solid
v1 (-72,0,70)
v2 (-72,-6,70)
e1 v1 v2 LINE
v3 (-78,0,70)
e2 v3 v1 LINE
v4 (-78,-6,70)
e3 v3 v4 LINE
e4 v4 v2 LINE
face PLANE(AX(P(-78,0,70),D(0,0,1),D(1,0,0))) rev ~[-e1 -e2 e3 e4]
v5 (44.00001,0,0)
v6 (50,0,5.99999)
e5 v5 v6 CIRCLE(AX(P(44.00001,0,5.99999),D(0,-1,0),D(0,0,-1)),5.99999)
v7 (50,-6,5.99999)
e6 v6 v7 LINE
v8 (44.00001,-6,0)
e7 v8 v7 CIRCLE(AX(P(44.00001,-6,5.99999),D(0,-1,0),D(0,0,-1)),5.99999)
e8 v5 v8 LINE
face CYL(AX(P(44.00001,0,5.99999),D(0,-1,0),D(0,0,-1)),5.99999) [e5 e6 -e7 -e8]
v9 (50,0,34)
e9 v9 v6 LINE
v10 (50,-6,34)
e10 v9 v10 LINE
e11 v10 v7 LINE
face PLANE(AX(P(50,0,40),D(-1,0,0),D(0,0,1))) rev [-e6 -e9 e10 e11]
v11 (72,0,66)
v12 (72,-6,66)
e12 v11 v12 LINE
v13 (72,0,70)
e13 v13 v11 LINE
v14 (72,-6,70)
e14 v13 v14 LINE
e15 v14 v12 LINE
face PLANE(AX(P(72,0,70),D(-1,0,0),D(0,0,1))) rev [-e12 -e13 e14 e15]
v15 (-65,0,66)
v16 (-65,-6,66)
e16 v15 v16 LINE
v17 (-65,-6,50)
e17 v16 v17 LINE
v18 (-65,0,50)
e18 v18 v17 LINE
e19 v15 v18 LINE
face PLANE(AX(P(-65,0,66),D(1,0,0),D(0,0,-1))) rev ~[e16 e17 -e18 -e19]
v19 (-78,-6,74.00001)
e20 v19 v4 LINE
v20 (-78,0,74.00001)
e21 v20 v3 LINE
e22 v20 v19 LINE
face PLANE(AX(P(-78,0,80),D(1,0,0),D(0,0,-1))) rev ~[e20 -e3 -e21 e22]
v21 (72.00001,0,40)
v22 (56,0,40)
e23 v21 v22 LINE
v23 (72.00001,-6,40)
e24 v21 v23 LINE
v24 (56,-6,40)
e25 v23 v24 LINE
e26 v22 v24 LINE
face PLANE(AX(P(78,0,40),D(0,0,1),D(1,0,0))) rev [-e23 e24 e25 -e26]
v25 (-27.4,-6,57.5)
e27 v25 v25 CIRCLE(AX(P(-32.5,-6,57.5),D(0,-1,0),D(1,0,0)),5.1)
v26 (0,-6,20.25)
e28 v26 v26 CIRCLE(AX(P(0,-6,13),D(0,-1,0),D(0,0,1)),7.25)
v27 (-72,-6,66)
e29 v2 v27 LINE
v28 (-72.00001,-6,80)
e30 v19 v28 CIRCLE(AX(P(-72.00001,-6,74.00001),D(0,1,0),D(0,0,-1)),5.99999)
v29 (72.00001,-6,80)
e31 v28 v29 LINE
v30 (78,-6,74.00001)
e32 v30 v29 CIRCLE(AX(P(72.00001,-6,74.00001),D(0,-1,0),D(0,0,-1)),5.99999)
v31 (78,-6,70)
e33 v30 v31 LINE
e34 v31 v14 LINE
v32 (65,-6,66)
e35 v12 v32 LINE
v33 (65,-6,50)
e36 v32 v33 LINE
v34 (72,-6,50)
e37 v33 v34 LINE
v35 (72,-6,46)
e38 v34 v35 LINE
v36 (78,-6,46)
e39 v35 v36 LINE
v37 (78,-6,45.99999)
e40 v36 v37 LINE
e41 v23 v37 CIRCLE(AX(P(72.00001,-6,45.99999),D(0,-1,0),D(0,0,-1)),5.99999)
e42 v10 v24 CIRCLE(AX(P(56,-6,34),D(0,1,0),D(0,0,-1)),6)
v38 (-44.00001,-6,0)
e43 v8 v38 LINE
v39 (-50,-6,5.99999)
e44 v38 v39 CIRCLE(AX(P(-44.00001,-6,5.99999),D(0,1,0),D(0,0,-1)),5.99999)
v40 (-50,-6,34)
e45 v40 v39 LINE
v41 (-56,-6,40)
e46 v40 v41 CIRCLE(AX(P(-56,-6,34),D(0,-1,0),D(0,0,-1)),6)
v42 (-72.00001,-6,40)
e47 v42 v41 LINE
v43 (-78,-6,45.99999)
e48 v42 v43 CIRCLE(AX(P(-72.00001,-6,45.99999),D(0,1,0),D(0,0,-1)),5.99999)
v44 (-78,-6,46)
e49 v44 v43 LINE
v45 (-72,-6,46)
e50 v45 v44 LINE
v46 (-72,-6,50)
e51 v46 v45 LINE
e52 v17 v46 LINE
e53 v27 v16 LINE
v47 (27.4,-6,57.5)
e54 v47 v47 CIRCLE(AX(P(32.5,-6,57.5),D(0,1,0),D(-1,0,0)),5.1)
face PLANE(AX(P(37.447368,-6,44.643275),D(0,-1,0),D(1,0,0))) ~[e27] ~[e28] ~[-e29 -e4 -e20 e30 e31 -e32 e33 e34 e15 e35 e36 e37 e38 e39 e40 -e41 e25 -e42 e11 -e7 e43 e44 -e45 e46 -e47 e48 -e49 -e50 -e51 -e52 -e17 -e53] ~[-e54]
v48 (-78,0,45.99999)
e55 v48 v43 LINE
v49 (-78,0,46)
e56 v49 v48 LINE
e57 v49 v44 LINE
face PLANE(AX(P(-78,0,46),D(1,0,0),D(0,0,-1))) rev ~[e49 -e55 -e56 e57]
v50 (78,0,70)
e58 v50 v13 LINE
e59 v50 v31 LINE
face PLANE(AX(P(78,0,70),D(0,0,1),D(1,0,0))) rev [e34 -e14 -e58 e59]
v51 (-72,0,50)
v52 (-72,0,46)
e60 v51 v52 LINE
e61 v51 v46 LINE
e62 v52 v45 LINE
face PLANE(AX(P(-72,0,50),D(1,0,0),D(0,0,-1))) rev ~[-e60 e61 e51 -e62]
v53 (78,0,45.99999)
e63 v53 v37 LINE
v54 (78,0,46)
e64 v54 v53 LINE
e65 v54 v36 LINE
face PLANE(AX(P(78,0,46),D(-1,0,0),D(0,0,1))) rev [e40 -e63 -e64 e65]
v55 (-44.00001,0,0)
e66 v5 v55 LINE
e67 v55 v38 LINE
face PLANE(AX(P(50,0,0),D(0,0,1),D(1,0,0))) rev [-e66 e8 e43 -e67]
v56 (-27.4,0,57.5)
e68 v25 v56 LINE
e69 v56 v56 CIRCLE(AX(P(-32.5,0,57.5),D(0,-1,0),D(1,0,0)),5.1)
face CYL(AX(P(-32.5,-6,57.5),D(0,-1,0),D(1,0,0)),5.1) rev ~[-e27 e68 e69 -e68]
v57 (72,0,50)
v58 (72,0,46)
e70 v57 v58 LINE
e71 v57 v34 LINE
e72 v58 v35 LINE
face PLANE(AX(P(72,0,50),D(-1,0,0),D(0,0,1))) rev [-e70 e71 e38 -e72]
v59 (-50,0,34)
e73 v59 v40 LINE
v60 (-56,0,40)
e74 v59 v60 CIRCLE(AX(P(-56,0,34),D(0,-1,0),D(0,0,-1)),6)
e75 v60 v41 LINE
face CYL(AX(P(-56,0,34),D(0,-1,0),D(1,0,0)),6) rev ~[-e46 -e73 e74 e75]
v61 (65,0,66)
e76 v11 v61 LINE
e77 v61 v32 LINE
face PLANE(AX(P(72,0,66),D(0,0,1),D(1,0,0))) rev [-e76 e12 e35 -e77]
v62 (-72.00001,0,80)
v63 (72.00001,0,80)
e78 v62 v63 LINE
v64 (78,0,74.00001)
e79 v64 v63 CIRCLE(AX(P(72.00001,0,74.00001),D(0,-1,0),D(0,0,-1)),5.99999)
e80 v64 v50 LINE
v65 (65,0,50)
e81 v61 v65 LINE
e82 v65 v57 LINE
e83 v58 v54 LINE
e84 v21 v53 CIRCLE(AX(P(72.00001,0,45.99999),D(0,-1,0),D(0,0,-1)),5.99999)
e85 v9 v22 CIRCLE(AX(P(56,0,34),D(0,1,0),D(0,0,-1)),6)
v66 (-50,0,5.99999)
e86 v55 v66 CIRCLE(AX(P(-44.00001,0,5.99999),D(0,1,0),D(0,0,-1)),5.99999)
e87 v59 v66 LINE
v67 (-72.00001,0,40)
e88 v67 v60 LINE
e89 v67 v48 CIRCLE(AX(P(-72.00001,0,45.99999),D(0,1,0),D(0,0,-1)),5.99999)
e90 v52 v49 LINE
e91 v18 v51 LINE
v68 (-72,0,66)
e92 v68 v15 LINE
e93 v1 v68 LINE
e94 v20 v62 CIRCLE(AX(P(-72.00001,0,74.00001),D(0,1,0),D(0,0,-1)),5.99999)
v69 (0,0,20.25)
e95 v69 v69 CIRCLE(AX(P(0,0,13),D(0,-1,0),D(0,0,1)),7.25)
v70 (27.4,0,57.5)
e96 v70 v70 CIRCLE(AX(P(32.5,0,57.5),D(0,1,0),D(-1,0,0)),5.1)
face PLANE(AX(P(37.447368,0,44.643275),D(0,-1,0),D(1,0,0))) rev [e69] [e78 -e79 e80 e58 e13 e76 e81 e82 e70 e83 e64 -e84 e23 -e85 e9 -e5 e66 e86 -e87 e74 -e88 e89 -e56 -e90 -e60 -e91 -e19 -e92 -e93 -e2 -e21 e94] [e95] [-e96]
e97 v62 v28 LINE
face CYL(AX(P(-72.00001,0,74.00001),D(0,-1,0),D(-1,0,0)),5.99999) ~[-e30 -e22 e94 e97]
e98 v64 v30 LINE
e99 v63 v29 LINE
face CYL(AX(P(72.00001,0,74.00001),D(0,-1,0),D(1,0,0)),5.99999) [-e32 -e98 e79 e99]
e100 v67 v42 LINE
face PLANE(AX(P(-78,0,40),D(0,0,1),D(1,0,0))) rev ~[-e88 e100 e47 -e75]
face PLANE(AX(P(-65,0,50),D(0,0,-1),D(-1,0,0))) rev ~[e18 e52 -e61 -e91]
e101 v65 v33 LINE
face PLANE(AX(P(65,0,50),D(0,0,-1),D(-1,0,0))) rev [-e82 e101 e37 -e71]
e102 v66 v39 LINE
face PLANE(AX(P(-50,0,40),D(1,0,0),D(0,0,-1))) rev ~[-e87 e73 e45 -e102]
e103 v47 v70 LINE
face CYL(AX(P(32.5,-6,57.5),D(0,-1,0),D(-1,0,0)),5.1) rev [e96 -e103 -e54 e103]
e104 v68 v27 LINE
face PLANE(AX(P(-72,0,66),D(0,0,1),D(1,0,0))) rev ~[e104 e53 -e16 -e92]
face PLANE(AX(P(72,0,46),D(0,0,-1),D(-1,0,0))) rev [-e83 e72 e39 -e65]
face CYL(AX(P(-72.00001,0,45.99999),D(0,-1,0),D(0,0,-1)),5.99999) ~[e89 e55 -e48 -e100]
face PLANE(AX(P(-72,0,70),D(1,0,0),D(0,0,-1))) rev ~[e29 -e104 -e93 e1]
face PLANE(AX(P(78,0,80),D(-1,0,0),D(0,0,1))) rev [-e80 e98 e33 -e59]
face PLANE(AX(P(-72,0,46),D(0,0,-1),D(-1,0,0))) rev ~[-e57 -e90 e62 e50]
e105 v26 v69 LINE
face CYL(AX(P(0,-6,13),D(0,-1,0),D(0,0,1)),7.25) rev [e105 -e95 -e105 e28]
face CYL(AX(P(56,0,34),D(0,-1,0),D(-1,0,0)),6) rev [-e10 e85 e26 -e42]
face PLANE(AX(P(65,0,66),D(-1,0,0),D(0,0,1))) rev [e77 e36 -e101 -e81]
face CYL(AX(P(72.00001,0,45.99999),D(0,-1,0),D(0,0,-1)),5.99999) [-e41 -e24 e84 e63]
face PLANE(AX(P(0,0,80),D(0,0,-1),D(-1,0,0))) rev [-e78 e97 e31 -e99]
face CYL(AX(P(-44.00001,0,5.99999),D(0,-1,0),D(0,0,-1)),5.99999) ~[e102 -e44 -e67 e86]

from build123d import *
from build123d import SkipClean  # not in build123d's __all__

# Parameters (mm, degrees)
F1_DEPTH = 6
F2_R     = 5.1
F3_DEPTH = 25
F5_DEPTH = 25
F6_R     = 5.99999
F8_R     = 6


# Not quite as in the source:
# - a fillet or chamfer is up to 0.001 mm smaller than in the source, because OpenCascade refuses the exact size


with BuildPart() as f1:
    # F0 (on Front) → F1 (new body)
    with BuildSketch(Plane.XZ):
        Polygon((-50, 0), (0, 0), (0, 80), (-78, 80), (-78, 70), (-72, 70), (-72, 66), (-65, 66), (-65, 50), (-72, 50), (-72, 46), (-78, 46), (-78, 40), (-50, 40), align=None)
    extrude(amount=F1_DEPTH)

    # F2 (on face) → F3 (cut)
    with BuildSketch(Plane.XZ.offset(6)):
        with Locations((-32.5, 57.5)):
            Circle(F2_R)
    extrude(amount=-F3_DEPTH, mode=Mode.SUBTRACT)

    # F4 (on face) → F5 (cut)
    with BuildSketch(Plane.XZ.offset(6)):
        with BuildLine():
            Line((0, 5.75), (0, 20.25))
            ThreePointArc((0, 20.25), (-7.25, 13), (0, 5.75))
        make_face()
    extrude(amount=-F5_DEPTH, mode=Mode.SUBTRACT)

    # F6 (radius 6 in the source; OpenCascade refuses exactly that, so slightly less here)
    f6_edges = [f1.edges().sort_by_distance(p)[0] for p in [
        (-78, -3, 80),
        (-78, -3, 40),
        (-50, -3, 0),
    ]]
    fillet(f6_edges, radius=F6_R)

    # F7: F1 across face


with BuildPart() as f1_1:
    add(f1.part, clean=False)
    with SkipClean():  # cleaning this boolean's faces spoils the solid; the shape is the same uncleaned
        add(f1.part.mirror(Plane(origin=(0, -3, 50.125), x_dir=(0, 1, 0), z_dir=(1, 0, 0))), clean=False)

    # F8
    f8_edges = [f1_1.edges().sort_by_distance(p)[0] for p in [
        (-50, -3, 40),
        (50, -3, 40),
    ]]
    fillet(f8_edges, radius=F8_R)


solid = f1_1.part
